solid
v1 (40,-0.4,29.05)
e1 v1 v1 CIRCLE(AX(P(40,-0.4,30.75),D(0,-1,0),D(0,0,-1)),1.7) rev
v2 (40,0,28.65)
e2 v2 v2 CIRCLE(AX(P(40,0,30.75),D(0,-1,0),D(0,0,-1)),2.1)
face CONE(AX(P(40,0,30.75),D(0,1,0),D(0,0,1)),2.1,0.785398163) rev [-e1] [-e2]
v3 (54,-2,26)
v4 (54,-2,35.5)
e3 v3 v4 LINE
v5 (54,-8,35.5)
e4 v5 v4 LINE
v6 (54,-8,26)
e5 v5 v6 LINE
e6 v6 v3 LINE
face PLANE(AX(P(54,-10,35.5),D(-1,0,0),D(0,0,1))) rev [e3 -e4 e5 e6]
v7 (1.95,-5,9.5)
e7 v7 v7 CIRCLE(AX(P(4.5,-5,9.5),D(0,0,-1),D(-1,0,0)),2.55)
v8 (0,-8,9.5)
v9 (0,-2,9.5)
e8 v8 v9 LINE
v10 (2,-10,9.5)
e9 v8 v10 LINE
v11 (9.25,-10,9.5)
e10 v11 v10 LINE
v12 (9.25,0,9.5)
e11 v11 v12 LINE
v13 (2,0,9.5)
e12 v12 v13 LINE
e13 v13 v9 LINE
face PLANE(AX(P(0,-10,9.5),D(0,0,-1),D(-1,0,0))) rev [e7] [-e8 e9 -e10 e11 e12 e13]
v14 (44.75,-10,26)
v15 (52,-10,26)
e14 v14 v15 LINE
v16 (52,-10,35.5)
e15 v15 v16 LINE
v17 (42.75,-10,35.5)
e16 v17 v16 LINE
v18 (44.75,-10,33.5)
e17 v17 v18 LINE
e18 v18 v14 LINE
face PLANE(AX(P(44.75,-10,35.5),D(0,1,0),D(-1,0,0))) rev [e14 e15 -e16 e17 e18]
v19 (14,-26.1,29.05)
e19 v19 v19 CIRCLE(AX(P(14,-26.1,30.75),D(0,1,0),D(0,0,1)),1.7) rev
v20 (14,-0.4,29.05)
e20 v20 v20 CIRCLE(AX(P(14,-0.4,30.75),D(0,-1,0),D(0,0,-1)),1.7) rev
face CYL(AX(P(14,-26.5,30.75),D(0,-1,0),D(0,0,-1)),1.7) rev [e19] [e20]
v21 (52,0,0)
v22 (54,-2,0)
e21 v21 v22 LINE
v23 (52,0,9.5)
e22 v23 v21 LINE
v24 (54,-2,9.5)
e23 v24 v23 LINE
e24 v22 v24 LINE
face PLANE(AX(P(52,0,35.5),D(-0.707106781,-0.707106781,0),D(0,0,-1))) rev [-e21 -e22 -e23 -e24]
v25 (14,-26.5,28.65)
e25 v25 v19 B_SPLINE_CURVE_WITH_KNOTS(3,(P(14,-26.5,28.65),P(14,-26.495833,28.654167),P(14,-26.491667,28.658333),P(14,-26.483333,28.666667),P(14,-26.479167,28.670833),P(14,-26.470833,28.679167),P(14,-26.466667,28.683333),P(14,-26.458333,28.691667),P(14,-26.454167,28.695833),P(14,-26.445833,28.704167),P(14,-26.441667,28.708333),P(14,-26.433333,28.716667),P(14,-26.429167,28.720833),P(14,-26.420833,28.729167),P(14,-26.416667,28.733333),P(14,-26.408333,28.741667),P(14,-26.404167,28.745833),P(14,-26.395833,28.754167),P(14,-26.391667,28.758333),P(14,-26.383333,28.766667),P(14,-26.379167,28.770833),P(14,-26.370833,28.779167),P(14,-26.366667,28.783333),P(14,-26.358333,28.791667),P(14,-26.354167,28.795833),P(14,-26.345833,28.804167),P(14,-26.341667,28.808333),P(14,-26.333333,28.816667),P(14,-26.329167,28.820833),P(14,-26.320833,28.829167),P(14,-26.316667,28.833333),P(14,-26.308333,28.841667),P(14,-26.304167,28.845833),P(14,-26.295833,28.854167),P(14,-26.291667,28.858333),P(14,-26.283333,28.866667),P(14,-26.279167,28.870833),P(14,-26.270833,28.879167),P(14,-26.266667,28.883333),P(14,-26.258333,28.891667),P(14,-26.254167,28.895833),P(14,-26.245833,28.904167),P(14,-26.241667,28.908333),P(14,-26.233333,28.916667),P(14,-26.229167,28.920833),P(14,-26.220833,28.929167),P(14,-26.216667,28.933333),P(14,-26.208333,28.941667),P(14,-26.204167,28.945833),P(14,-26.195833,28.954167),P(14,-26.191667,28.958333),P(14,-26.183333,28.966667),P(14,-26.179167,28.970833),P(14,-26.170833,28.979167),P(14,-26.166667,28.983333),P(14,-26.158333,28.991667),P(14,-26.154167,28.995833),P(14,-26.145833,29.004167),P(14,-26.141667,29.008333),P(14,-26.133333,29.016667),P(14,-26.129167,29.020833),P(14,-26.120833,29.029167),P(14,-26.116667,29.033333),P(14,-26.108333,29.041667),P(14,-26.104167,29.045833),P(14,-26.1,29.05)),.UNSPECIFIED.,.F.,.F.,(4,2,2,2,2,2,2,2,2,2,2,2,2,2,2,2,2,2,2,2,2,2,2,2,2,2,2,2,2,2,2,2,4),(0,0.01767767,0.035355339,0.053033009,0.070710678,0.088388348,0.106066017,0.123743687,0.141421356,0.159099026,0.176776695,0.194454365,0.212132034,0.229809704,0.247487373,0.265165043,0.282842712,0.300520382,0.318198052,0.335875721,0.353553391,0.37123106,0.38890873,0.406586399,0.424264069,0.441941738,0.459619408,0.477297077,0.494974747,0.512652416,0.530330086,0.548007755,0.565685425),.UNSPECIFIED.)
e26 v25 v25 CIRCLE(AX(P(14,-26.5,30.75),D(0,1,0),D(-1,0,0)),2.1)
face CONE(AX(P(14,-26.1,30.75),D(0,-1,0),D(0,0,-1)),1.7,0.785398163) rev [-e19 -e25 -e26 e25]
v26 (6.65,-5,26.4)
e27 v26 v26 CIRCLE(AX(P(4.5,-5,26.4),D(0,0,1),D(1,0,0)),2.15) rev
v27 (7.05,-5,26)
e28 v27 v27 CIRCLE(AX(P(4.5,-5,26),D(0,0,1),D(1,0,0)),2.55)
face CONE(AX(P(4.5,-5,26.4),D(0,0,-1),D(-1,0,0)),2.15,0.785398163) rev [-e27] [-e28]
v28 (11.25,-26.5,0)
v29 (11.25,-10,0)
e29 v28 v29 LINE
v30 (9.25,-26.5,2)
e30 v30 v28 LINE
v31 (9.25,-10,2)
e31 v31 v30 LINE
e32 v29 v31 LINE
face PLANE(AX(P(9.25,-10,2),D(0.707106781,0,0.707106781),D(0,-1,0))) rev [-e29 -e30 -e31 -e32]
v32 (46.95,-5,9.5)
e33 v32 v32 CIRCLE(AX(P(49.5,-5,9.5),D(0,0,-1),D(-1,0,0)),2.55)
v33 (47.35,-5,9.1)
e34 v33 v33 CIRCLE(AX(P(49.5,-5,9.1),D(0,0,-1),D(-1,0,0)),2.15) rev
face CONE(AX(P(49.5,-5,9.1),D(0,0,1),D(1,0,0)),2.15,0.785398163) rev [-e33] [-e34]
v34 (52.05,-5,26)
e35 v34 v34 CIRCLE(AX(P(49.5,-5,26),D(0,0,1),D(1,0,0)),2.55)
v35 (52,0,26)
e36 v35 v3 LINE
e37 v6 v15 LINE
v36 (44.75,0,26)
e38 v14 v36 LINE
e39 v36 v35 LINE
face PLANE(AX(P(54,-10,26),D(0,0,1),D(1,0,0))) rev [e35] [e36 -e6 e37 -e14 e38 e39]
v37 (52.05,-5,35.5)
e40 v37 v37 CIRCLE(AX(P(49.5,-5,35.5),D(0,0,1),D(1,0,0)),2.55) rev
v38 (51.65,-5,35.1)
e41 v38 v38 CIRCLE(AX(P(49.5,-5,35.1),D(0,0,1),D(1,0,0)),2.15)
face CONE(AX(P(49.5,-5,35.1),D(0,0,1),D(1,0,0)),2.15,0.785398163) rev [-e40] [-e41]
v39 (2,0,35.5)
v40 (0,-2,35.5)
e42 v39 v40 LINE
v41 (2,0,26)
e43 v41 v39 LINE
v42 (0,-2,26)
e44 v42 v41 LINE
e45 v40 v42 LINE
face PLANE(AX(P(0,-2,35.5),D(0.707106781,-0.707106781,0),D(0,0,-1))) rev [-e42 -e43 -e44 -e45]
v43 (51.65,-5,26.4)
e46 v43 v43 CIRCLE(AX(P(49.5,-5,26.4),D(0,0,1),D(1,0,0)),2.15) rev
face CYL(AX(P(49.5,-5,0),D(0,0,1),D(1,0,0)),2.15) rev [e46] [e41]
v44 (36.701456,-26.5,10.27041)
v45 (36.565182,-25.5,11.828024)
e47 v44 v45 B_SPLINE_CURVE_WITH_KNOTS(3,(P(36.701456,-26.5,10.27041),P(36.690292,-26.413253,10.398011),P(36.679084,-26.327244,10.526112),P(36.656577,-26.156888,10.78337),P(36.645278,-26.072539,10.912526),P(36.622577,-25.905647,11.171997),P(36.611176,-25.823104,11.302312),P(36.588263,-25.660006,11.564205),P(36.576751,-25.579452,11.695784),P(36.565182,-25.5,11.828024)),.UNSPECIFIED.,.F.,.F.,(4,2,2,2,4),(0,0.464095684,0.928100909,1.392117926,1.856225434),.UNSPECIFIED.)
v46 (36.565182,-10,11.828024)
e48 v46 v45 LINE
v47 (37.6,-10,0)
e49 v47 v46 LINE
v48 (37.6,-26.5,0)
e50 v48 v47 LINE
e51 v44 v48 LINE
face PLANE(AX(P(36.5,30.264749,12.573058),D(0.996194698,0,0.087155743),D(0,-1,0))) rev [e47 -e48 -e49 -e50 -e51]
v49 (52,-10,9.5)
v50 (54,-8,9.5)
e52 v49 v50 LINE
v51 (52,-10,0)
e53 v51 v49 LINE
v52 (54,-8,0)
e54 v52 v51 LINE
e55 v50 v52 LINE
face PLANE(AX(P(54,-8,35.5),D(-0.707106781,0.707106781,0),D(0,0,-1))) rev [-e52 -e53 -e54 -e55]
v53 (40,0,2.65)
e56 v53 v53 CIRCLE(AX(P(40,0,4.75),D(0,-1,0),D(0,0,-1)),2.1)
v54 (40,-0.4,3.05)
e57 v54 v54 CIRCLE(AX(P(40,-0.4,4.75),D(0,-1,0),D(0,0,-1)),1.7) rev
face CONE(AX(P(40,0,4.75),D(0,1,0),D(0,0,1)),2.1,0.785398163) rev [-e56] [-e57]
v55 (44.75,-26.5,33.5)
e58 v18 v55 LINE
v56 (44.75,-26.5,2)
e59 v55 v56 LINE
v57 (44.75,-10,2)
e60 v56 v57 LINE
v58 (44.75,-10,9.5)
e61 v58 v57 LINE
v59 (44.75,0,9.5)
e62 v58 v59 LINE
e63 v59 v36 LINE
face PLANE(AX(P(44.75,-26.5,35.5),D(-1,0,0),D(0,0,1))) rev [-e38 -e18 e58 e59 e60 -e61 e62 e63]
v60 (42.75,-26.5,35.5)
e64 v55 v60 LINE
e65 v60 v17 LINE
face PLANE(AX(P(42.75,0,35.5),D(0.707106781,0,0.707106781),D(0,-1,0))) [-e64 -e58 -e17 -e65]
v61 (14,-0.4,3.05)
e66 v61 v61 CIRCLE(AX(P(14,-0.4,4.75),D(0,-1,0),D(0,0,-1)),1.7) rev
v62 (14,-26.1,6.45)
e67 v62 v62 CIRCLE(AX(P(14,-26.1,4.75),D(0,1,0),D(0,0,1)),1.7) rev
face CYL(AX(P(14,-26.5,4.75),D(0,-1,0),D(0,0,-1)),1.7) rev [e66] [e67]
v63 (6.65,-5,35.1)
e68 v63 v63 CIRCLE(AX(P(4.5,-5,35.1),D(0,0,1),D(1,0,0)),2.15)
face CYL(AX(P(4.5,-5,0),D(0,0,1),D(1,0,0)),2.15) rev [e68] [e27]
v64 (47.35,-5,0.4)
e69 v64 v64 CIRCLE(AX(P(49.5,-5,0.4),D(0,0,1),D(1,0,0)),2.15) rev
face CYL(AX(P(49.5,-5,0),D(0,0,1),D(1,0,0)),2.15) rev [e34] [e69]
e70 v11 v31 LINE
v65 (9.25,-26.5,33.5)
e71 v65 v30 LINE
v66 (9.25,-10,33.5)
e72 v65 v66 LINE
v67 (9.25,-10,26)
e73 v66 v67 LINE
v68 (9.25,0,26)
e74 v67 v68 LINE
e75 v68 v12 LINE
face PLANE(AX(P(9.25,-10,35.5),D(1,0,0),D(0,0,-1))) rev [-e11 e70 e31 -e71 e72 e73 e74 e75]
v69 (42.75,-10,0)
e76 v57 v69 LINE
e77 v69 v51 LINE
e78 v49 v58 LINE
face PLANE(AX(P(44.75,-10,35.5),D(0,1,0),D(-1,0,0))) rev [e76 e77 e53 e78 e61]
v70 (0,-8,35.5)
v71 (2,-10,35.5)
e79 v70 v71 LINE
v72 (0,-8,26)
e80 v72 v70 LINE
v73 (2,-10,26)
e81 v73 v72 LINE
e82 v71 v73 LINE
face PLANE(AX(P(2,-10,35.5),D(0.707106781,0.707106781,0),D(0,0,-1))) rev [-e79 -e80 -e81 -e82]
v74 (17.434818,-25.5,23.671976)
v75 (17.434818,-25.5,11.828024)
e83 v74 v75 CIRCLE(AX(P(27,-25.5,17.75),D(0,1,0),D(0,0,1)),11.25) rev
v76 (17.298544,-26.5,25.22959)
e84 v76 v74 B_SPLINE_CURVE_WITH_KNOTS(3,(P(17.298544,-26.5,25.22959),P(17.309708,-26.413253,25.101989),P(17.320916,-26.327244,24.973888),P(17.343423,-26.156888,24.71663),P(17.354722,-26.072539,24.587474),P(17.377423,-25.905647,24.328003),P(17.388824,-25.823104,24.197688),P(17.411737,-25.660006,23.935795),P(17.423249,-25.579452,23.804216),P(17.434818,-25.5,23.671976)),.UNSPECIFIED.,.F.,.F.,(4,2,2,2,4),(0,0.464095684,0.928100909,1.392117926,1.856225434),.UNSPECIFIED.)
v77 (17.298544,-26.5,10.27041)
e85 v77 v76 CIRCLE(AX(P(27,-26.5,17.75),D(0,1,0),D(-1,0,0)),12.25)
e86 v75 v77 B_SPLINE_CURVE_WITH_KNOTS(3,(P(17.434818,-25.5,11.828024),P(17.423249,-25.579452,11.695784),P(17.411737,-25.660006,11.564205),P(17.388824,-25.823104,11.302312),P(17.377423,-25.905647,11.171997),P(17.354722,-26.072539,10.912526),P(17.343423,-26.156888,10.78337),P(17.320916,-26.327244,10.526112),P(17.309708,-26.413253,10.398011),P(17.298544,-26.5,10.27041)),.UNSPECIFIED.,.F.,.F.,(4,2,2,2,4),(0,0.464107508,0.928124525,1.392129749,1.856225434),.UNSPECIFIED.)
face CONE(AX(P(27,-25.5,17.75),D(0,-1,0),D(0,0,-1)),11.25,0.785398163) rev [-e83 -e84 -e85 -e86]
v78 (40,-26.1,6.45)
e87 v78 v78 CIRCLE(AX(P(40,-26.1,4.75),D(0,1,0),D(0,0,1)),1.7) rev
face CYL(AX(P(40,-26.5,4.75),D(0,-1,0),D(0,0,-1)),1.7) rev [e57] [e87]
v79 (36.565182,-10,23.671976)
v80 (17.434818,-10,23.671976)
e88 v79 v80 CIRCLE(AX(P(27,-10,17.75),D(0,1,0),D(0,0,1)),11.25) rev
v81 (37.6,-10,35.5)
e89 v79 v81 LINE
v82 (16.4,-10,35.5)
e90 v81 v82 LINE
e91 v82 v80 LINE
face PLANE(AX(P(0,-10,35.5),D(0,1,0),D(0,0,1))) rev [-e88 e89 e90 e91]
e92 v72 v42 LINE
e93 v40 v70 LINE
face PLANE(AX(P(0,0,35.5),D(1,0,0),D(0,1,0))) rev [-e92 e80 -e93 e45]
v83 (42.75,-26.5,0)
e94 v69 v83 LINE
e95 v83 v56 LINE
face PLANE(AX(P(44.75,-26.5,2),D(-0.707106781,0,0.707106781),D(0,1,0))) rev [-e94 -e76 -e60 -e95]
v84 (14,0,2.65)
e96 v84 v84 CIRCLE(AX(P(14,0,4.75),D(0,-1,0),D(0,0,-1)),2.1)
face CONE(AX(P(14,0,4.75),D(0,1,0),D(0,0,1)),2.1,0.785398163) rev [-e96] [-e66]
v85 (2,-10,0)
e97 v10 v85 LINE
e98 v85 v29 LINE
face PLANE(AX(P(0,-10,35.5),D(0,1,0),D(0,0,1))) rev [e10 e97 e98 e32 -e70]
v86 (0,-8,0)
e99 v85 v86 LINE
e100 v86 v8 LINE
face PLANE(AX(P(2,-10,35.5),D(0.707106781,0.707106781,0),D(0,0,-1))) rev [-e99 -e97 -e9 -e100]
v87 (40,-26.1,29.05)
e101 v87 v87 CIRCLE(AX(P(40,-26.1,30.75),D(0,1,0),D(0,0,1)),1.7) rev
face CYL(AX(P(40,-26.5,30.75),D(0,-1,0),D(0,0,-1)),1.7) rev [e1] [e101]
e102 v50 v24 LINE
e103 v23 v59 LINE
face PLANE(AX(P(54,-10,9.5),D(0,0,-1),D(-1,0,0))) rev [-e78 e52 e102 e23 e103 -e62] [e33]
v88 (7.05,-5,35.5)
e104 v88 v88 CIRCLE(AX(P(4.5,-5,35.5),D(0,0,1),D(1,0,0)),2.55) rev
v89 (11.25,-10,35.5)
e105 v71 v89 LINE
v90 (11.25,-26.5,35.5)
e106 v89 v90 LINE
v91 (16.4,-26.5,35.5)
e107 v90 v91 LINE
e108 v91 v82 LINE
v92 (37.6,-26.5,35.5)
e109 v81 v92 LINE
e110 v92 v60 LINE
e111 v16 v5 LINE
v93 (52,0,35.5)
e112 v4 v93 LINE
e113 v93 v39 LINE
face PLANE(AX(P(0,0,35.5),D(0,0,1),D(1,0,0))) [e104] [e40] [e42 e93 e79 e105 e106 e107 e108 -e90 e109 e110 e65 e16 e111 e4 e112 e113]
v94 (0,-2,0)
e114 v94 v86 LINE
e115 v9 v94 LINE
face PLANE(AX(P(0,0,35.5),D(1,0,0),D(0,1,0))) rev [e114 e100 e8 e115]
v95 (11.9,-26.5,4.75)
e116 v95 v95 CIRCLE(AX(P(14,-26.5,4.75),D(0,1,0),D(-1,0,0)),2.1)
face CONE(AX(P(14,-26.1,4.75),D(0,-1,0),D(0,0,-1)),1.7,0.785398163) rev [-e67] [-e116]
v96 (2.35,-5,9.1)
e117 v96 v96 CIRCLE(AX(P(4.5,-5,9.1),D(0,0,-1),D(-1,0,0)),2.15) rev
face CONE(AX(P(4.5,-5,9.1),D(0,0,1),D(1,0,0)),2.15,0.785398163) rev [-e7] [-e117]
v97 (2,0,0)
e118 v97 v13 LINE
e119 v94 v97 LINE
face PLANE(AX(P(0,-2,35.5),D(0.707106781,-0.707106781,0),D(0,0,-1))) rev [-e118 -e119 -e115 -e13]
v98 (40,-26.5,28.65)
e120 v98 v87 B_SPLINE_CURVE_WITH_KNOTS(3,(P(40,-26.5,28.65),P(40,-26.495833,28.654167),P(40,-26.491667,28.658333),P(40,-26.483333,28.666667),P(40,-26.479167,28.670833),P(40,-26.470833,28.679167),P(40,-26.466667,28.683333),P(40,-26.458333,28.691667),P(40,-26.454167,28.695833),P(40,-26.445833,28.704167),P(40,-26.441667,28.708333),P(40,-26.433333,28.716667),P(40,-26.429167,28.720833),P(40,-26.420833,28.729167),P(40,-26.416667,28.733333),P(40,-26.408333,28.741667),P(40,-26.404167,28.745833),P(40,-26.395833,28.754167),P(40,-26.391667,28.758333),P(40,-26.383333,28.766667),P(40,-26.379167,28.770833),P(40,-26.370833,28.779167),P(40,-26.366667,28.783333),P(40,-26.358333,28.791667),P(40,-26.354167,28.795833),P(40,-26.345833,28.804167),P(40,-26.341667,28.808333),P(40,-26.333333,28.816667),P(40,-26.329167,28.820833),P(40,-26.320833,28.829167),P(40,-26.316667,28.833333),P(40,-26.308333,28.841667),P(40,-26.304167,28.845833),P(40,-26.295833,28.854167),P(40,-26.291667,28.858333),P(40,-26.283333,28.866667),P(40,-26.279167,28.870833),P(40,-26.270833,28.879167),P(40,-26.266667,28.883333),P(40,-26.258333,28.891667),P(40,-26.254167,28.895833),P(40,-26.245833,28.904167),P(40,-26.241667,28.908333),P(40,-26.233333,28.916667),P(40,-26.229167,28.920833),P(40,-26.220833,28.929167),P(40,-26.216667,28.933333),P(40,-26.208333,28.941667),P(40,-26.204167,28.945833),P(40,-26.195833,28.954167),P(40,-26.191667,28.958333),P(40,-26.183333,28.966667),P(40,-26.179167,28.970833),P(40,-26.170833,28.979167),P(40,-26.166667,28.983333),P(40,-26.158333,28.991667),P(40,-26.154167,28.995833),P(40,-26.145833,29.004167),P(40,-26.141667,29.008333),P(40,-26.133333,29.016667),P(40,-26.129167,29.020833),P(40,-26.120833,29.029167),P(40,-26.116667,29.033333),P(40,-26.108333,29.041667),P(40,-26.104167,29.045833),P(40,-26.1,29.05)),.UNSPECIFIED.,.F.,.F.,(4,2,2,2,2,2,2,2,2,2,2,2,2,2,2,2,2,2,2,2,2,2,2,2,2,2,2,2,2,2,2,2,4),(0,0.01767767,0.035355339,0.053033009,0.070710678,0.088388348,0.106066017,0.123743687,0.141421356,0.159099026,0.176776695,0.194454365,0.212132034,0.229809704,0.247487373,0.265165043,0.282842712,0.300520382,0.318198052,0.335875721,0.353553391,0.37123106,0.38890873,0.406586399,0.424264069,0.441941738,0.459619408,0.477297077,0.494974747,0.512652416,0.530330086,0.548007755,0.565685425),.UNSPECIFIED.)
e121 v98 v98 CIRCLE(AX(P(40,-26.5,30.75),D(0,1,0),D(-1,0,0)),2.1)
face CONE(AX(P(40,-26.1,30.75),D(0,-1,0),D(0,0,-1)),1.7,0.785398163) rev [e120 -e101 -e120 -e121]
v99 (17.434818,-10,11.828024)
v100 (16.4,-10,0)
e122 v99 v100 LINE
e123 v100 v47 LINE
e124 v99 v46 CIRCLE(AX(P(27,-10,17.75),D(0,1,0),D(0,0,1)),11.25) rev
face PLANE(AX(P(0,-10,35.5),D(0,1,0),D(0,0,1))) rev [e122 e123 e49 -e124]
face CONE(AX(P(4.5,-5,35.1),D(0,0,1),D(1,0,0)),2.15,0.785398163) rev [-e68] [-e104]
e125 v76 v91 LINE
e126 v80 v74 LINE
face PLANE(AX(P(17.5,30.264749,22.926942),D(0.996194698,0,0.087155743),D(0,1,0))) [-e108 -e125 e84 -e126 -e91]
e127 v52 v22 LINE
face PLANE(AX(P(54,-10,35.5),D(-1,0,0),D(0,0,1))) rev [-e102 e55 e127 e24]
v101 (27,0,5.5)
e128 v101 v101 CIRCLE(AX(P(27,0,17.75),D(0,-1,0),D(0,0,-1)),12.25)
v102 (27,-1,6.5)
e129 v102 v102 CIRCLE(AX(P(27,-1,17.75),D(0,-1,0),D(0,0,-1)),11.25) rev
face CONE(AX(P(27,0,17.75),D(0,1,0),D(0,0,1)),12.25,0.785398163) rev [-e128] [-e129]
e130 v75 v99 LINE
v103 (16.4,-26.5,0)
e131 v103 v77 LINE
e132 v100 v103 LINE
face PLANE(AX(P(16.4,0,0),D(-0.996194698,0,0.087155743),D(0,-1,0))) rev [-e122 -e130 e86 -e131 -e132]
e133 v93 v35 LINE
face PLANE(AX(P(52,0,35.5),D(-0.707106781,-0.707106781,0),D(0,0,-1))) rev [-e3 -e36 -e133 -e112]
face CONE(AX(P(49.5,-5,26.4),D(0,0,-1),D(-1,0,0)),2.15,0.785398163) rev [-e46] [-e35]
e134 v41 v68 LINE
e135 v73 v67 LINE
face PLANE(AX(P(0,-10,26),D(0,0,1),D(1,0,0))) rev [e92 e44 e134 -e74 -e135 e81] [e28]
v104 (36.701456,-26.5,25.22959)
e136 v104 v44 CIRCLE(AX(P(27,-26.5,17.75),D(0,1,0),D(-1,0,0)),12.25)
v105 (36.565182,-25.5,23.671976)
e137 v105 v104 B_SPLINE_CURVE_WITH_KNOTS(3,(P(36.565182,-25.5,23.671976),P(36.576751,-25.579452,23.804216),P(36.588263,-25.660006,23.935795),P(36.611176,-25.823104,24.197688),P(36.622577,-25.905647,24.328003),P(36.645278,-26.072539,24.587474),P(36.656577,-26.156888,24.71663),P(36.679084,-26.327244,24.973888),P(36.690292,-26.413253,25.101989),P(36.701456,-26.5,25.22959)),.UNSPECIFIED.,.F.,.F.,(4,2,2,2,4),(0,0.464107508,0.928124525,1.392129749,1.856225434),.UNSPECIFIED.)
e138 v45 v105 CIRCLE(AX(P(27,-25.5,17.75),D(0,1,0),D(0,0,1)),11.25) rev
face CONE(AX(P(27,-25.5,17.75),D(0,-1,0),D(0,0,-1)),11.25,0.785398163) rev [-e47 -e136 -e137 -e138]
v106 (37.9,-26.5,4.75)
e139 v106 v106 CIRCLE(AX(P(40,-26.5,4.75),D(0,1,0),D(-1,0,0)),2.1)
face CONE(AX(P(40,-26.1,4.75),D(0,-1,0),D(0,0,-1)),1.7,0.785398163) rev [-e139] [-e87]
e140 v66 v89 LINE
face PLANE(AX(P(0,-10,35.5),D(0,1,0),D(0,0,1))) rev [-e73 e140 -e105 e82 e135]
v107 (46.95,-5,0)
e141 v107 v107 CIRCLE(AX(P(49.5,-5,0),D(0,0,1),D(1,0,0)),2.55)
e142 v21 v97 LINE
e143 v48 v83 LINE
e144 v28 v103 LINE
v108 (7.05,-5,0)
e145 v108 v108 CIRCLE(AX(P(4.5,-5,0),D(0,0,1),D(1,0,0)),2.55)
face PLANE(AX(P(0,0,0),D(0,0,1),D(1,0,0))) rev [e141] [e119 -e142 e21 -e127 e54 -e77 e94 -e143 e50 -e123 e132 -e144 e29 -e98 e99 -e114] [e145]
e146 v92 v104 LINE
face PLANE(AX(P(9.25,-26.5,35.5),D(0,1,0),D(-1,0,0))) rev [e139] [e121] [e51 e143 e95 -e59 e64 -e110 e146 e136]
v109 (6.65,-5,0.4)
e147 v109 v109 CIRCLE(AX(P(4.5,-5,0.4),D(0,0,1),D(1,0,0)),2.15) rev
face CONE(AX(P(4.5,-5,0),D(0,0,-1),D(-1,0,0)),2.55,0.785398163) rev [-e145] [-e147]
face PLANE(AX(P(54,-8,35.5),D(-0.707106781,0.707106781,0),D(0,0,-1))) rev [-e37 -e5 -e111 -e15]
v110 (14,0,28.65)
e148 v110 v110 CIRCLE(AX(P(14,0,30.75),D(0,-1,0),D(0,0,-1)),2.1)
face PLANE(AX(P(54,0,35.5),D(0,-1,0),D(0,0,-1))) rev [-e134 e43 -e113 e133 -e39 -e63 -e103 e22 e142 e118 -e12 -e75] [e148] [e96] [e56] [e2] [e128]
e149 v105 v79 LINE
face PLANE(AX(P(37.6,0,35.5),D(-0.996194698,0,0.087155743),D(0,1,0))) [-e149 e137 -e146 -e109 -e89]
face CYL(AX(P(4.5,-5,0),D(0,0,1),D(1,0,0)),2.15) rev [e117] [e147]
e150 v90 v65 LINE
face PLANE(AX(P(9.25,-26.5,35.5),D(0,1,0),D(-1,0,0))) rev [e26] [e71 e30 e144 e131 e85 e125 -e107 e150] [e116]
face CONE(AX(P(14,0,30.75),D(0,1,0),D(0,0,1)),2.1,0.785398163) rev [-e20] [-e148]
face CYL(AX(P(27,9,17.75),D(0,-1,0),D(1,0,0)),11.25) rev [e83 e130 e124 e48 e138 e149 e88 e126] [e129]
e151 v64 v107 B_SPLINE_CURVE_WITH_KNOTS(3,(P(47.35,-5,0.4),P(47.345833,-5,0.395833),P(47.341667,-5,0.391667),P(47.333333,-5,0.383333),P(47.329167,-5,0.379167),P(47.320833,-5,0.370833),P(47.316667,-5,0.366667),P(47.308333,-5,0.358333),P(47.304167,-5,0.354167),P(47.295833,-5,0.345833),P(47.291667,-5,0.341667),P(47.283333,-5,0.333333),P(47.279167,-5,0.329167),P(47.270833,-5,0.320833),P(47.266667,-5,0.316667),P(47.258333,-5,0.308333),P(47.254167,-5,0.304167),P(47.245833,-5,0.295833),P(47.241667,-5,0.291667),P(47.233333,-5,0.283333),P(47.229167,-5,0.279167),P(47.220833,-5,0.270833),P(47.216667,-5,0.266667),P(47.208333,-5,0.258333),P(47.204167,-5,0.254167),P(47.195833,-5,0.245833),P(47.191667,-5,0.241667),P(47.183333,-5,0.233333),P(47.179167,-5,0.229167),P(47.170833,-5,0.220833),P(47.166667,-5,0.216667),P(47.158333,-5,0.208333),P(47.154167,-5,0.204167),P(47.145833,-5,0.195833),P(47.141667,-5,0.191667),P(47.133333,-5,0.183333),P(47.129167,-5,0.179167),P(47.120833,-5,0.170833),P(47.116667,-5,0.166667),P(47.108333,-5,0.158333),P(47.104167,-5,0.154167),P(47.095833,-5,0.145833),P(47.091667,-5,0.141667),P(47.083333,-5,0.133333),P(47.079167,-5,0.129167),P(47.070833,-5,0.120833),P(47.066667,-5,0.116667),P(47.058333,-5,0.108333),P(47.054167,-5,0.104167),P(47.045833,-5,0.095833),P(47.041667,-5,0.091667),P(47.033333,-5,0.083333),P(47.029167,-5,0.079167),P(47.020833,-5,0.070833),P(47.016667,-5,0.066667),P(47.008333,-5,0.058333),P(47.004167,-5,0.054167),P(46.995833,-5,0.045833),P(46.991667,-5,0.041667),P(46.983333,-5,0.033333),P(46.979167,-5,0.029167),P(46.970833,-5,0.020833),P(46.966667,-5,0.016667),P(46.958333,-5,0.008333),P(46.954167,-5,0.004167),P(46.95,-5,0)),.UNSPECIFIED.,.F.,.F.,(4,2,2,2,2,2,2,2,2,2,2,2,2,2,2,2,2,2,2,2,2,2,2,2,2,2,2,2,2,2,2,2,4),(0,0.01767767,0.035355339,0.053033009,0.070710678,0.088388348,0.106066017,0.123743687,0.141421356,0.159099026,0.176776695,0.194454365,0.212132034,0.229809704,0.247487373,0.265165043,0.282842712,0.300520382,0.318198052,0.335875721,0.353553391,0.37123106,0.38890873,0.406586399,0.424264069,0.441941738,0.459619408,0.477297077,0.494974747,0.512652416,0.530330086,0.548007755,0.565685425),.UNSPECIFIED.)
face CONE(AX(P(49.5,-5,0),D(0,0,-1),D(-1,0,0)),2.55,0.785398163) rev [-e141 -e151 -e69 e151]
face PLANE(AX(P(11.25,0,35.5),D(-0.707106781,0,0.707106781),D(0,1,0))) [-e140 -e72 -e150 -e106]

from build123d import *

# Parameters (mm, degrees)
BOSS_EXTRUDE1_DEPTH  = 35.5
SKETCH2_R            = 2.15
CUT_EXTRUDE1_DEPTH   = 35.5
SKETCH3_R            = 11.25
CUT_EXTRUDE2_DEPTH   = 35.5
M3_CLEARANCE_HOLE1_D = 3.4
SKETCH8_W            = 19
SKETCH8_H            = 35.5
CUT_EXTRUDE3_DEPTH   = 16.5
CHAMFER1_SIZE        = 1.1
CHAMFER1_SIZE_2      = 12.573057533
SKETCH9_W            = 9.25
SKETCH9_H            = 16.5
CUT_EXTRUDE4_DEPTH   = 10
CHAMFER4_SIZE        = 2
CHAMFER6_SIZE        = 1
CHAMFER7_SIZE        = 0.4
CHAMFER8_SIZE        = 2


with BuildPart() as part:
    # Sketch1 → Boss-Extrude1 (new body)
    with BuildSketch(Plane.XY):
        Polygon((0, 0), (0, -10), (9.25, -10), (9.25, -26.5), (44.75, -26.5), (44.75, -10), (54, -10), (54, 0), align=None)
    extrude(amount=BOSS_EXTRUDE1_DEPTH)

    # Sketch2 → Cut-Extrude1 (cut)
    with BuildSketch(Plane.XY.offset(35.5)):
        with Locations((4.5, -5)):
            Circle(SKETCH2_R)
        with Locations((49.5, -5)):
            Circle(SKETCH2_R)
    extrude(amount=-CUT_EXTRUDE1_DEPTH, mode=Mode.SUBTRACT)

    # Sketch3 → Cut-Extrude2 (cut)
    with BuildSketch(Plane.XZ.offset(26.5)):
        with Locations((27, 17.75)):
            Circle(SKETCH3_R)
    extrude(amount=-CUT_EXTRUDE2_DEPTH, mode=Mode.SUBTRACT)

    # M3 Clearance Hole1 (through all)
    with Locations(Plane(origin=(0, -26.5, 0), x_dir=(-1, 0, 0), z_dir=(0, -1, 0))):
        with Locations((-14, -30.75), (-40, -30.75), (-40, -4.75), (-14, -4.75)):
            Hole(M3_CLEARANCE_HOLE1_D / 2)

    # Sketch8 → Cut-Extrude3 (cut)
    with BuildSketch(Plane.XZ.offset(26.5)):
        with Locations((27, 17.75)):
            Rectangle(SKETCH8_W, SKETCH8_H)
    extrude(amount=-CUT_EXTRUDE3_DEPTH, mode=Mode.SUBTRACT)

    # Chamfer1
    # the kernel refuses this chamfer: 12.573057533, 1.1 mm, written as the material it takes off along each edge
    with BuildSketch(Plane(origin=(36.5, -59.185348851, 0), x_dir=(0.9159861691531063, 0, -0.40120984275091887), z_dir=(0, 1, 0)), Plane(origin=(17.5, -59.185348851, 35.5), x_dir=(-0.9159861691531072, 0, 0.40120984275091703), z_dir=(0, 1, 0))) as chamfer1_piece_1:
        Polygon((CHAMFER1_SIZE * 0.915986169153, -CHAMFER1_SIZE * 0.401209842751), (-CHAMFER1_SIZE_2 * 0.401209842752, -CHAMFER1_SIZE_2 * 0.915986169156), (0, 0), align=None)
    extrude(amount=49.185348851, mode=Mode.SUBTRACT)
    with BuildSketch(Plane(origin=(17.5, -59.185348851, 0), x_dir=(-0.9159861691531066, 0, -0.4012098427509178), z_dir=(0, 1, 0)), Plane(origin=(36.5, -59.185348851, 35.5), x_dir=(0.9159861691531066, 0, 0.40120984275091803), z_dir=(0, 1, 0))) as chamfer1_piece_2:
        Polygon((CHAMFER1_SIZE * 0.915986169153, CHAMFER1_SIZE * 0.401209842751), (-CHAMFER1_SIZE_2 * 0.401209842752, CHAMFER1_SIZE_2 * 0.915986169156), (0, 0), align=None)
    extrude(amount=49.185348851, mode=Mode.SUBTRACT)

    # Sketch9 → Cut-Extrude4 (cut)
    with BuildSketch(Plane(origin=(0, 0, 0), x_dir=(1, 0, 0), z_dir=(0, 1, 0))):
        with Locations((4.625, -17.75)):
            Rectangle(SKETCH9_W, SKETCH9_H)
        with Locations((49.375, -17.75)):
            Rectangle(SKETCH9_W, SKETCH9_H)
    extrude(amount=-CUT_EXTRUDE4_DEPTH, mode=Mode.SUBTRACT)

    # Chamfer4
    chamfer4_edges = [part.edges().sort_by_distance(p)[0] for p in [
        (54, 0, 30.75),
        (54, -10, 30.75),
        (0, -10, 30.75),
        (0, 0, 30.75),
        (54, 0, 4.75),
        (54, -10, 4.75),
        (0, -10, 4.75),
        (0, 0, 4.75),
    ]]
    chamfer(chamfer4_edges, length=CHAMFER4_SIZE)

    # Chamfer6
    chamfer6_edges = [part.edges().sort_by_distance(p)[0] for p in [
        (15.75, 0, 17.75),
        (37.820600651, -26.5, 14.67150986),
        (15.75, -26.5, 17.75),
    ]]
    chamfer(chamfer6_edges, length=CHAMFER6_SIZE)

    # Chamfer7
    chamfer7_edges = [part.edges().sort_by_distance(p)[0] for p in [
        (2.35, -5, 9.5),
        (2.35, -5, 26),
        (47.35, -5, 26),
        (47.35, -5, 9.5),
        (2.35, -5, 0),
        (2.35, -5, 35.5),
        (47.35, -5, 0),
        (47.35, -5, 35.5),
        (12.3, -26.5, 4.75),
        (12.3, 0, 4.75),
        (38.3, -26.5, 4.75),
        (38.3, 0, 4.75),
        (38.3, -26.5, 30.75),
        (38.3, 0, 30.75),
        (12.3, -26.5, 30.75),
        (12.3, 0, 30.75),
    ]]
    chamfer(chamfer7_edges, length=CHAMFER7_SIZE)

    # Chamfer8
    chamfer8_edges = [part.edges().sort_by_distance(p)[0] for p in [
        (9.25, -18.25, 35.5),
        (44.75, -18.25, 35.5),
        (44.75, -18.25, 0),
        (9.25, -18.25, 0),
    ]]
    chamfer(chamfer8_edges, length=CHAMFER8_SIZE)


solid = part.part
